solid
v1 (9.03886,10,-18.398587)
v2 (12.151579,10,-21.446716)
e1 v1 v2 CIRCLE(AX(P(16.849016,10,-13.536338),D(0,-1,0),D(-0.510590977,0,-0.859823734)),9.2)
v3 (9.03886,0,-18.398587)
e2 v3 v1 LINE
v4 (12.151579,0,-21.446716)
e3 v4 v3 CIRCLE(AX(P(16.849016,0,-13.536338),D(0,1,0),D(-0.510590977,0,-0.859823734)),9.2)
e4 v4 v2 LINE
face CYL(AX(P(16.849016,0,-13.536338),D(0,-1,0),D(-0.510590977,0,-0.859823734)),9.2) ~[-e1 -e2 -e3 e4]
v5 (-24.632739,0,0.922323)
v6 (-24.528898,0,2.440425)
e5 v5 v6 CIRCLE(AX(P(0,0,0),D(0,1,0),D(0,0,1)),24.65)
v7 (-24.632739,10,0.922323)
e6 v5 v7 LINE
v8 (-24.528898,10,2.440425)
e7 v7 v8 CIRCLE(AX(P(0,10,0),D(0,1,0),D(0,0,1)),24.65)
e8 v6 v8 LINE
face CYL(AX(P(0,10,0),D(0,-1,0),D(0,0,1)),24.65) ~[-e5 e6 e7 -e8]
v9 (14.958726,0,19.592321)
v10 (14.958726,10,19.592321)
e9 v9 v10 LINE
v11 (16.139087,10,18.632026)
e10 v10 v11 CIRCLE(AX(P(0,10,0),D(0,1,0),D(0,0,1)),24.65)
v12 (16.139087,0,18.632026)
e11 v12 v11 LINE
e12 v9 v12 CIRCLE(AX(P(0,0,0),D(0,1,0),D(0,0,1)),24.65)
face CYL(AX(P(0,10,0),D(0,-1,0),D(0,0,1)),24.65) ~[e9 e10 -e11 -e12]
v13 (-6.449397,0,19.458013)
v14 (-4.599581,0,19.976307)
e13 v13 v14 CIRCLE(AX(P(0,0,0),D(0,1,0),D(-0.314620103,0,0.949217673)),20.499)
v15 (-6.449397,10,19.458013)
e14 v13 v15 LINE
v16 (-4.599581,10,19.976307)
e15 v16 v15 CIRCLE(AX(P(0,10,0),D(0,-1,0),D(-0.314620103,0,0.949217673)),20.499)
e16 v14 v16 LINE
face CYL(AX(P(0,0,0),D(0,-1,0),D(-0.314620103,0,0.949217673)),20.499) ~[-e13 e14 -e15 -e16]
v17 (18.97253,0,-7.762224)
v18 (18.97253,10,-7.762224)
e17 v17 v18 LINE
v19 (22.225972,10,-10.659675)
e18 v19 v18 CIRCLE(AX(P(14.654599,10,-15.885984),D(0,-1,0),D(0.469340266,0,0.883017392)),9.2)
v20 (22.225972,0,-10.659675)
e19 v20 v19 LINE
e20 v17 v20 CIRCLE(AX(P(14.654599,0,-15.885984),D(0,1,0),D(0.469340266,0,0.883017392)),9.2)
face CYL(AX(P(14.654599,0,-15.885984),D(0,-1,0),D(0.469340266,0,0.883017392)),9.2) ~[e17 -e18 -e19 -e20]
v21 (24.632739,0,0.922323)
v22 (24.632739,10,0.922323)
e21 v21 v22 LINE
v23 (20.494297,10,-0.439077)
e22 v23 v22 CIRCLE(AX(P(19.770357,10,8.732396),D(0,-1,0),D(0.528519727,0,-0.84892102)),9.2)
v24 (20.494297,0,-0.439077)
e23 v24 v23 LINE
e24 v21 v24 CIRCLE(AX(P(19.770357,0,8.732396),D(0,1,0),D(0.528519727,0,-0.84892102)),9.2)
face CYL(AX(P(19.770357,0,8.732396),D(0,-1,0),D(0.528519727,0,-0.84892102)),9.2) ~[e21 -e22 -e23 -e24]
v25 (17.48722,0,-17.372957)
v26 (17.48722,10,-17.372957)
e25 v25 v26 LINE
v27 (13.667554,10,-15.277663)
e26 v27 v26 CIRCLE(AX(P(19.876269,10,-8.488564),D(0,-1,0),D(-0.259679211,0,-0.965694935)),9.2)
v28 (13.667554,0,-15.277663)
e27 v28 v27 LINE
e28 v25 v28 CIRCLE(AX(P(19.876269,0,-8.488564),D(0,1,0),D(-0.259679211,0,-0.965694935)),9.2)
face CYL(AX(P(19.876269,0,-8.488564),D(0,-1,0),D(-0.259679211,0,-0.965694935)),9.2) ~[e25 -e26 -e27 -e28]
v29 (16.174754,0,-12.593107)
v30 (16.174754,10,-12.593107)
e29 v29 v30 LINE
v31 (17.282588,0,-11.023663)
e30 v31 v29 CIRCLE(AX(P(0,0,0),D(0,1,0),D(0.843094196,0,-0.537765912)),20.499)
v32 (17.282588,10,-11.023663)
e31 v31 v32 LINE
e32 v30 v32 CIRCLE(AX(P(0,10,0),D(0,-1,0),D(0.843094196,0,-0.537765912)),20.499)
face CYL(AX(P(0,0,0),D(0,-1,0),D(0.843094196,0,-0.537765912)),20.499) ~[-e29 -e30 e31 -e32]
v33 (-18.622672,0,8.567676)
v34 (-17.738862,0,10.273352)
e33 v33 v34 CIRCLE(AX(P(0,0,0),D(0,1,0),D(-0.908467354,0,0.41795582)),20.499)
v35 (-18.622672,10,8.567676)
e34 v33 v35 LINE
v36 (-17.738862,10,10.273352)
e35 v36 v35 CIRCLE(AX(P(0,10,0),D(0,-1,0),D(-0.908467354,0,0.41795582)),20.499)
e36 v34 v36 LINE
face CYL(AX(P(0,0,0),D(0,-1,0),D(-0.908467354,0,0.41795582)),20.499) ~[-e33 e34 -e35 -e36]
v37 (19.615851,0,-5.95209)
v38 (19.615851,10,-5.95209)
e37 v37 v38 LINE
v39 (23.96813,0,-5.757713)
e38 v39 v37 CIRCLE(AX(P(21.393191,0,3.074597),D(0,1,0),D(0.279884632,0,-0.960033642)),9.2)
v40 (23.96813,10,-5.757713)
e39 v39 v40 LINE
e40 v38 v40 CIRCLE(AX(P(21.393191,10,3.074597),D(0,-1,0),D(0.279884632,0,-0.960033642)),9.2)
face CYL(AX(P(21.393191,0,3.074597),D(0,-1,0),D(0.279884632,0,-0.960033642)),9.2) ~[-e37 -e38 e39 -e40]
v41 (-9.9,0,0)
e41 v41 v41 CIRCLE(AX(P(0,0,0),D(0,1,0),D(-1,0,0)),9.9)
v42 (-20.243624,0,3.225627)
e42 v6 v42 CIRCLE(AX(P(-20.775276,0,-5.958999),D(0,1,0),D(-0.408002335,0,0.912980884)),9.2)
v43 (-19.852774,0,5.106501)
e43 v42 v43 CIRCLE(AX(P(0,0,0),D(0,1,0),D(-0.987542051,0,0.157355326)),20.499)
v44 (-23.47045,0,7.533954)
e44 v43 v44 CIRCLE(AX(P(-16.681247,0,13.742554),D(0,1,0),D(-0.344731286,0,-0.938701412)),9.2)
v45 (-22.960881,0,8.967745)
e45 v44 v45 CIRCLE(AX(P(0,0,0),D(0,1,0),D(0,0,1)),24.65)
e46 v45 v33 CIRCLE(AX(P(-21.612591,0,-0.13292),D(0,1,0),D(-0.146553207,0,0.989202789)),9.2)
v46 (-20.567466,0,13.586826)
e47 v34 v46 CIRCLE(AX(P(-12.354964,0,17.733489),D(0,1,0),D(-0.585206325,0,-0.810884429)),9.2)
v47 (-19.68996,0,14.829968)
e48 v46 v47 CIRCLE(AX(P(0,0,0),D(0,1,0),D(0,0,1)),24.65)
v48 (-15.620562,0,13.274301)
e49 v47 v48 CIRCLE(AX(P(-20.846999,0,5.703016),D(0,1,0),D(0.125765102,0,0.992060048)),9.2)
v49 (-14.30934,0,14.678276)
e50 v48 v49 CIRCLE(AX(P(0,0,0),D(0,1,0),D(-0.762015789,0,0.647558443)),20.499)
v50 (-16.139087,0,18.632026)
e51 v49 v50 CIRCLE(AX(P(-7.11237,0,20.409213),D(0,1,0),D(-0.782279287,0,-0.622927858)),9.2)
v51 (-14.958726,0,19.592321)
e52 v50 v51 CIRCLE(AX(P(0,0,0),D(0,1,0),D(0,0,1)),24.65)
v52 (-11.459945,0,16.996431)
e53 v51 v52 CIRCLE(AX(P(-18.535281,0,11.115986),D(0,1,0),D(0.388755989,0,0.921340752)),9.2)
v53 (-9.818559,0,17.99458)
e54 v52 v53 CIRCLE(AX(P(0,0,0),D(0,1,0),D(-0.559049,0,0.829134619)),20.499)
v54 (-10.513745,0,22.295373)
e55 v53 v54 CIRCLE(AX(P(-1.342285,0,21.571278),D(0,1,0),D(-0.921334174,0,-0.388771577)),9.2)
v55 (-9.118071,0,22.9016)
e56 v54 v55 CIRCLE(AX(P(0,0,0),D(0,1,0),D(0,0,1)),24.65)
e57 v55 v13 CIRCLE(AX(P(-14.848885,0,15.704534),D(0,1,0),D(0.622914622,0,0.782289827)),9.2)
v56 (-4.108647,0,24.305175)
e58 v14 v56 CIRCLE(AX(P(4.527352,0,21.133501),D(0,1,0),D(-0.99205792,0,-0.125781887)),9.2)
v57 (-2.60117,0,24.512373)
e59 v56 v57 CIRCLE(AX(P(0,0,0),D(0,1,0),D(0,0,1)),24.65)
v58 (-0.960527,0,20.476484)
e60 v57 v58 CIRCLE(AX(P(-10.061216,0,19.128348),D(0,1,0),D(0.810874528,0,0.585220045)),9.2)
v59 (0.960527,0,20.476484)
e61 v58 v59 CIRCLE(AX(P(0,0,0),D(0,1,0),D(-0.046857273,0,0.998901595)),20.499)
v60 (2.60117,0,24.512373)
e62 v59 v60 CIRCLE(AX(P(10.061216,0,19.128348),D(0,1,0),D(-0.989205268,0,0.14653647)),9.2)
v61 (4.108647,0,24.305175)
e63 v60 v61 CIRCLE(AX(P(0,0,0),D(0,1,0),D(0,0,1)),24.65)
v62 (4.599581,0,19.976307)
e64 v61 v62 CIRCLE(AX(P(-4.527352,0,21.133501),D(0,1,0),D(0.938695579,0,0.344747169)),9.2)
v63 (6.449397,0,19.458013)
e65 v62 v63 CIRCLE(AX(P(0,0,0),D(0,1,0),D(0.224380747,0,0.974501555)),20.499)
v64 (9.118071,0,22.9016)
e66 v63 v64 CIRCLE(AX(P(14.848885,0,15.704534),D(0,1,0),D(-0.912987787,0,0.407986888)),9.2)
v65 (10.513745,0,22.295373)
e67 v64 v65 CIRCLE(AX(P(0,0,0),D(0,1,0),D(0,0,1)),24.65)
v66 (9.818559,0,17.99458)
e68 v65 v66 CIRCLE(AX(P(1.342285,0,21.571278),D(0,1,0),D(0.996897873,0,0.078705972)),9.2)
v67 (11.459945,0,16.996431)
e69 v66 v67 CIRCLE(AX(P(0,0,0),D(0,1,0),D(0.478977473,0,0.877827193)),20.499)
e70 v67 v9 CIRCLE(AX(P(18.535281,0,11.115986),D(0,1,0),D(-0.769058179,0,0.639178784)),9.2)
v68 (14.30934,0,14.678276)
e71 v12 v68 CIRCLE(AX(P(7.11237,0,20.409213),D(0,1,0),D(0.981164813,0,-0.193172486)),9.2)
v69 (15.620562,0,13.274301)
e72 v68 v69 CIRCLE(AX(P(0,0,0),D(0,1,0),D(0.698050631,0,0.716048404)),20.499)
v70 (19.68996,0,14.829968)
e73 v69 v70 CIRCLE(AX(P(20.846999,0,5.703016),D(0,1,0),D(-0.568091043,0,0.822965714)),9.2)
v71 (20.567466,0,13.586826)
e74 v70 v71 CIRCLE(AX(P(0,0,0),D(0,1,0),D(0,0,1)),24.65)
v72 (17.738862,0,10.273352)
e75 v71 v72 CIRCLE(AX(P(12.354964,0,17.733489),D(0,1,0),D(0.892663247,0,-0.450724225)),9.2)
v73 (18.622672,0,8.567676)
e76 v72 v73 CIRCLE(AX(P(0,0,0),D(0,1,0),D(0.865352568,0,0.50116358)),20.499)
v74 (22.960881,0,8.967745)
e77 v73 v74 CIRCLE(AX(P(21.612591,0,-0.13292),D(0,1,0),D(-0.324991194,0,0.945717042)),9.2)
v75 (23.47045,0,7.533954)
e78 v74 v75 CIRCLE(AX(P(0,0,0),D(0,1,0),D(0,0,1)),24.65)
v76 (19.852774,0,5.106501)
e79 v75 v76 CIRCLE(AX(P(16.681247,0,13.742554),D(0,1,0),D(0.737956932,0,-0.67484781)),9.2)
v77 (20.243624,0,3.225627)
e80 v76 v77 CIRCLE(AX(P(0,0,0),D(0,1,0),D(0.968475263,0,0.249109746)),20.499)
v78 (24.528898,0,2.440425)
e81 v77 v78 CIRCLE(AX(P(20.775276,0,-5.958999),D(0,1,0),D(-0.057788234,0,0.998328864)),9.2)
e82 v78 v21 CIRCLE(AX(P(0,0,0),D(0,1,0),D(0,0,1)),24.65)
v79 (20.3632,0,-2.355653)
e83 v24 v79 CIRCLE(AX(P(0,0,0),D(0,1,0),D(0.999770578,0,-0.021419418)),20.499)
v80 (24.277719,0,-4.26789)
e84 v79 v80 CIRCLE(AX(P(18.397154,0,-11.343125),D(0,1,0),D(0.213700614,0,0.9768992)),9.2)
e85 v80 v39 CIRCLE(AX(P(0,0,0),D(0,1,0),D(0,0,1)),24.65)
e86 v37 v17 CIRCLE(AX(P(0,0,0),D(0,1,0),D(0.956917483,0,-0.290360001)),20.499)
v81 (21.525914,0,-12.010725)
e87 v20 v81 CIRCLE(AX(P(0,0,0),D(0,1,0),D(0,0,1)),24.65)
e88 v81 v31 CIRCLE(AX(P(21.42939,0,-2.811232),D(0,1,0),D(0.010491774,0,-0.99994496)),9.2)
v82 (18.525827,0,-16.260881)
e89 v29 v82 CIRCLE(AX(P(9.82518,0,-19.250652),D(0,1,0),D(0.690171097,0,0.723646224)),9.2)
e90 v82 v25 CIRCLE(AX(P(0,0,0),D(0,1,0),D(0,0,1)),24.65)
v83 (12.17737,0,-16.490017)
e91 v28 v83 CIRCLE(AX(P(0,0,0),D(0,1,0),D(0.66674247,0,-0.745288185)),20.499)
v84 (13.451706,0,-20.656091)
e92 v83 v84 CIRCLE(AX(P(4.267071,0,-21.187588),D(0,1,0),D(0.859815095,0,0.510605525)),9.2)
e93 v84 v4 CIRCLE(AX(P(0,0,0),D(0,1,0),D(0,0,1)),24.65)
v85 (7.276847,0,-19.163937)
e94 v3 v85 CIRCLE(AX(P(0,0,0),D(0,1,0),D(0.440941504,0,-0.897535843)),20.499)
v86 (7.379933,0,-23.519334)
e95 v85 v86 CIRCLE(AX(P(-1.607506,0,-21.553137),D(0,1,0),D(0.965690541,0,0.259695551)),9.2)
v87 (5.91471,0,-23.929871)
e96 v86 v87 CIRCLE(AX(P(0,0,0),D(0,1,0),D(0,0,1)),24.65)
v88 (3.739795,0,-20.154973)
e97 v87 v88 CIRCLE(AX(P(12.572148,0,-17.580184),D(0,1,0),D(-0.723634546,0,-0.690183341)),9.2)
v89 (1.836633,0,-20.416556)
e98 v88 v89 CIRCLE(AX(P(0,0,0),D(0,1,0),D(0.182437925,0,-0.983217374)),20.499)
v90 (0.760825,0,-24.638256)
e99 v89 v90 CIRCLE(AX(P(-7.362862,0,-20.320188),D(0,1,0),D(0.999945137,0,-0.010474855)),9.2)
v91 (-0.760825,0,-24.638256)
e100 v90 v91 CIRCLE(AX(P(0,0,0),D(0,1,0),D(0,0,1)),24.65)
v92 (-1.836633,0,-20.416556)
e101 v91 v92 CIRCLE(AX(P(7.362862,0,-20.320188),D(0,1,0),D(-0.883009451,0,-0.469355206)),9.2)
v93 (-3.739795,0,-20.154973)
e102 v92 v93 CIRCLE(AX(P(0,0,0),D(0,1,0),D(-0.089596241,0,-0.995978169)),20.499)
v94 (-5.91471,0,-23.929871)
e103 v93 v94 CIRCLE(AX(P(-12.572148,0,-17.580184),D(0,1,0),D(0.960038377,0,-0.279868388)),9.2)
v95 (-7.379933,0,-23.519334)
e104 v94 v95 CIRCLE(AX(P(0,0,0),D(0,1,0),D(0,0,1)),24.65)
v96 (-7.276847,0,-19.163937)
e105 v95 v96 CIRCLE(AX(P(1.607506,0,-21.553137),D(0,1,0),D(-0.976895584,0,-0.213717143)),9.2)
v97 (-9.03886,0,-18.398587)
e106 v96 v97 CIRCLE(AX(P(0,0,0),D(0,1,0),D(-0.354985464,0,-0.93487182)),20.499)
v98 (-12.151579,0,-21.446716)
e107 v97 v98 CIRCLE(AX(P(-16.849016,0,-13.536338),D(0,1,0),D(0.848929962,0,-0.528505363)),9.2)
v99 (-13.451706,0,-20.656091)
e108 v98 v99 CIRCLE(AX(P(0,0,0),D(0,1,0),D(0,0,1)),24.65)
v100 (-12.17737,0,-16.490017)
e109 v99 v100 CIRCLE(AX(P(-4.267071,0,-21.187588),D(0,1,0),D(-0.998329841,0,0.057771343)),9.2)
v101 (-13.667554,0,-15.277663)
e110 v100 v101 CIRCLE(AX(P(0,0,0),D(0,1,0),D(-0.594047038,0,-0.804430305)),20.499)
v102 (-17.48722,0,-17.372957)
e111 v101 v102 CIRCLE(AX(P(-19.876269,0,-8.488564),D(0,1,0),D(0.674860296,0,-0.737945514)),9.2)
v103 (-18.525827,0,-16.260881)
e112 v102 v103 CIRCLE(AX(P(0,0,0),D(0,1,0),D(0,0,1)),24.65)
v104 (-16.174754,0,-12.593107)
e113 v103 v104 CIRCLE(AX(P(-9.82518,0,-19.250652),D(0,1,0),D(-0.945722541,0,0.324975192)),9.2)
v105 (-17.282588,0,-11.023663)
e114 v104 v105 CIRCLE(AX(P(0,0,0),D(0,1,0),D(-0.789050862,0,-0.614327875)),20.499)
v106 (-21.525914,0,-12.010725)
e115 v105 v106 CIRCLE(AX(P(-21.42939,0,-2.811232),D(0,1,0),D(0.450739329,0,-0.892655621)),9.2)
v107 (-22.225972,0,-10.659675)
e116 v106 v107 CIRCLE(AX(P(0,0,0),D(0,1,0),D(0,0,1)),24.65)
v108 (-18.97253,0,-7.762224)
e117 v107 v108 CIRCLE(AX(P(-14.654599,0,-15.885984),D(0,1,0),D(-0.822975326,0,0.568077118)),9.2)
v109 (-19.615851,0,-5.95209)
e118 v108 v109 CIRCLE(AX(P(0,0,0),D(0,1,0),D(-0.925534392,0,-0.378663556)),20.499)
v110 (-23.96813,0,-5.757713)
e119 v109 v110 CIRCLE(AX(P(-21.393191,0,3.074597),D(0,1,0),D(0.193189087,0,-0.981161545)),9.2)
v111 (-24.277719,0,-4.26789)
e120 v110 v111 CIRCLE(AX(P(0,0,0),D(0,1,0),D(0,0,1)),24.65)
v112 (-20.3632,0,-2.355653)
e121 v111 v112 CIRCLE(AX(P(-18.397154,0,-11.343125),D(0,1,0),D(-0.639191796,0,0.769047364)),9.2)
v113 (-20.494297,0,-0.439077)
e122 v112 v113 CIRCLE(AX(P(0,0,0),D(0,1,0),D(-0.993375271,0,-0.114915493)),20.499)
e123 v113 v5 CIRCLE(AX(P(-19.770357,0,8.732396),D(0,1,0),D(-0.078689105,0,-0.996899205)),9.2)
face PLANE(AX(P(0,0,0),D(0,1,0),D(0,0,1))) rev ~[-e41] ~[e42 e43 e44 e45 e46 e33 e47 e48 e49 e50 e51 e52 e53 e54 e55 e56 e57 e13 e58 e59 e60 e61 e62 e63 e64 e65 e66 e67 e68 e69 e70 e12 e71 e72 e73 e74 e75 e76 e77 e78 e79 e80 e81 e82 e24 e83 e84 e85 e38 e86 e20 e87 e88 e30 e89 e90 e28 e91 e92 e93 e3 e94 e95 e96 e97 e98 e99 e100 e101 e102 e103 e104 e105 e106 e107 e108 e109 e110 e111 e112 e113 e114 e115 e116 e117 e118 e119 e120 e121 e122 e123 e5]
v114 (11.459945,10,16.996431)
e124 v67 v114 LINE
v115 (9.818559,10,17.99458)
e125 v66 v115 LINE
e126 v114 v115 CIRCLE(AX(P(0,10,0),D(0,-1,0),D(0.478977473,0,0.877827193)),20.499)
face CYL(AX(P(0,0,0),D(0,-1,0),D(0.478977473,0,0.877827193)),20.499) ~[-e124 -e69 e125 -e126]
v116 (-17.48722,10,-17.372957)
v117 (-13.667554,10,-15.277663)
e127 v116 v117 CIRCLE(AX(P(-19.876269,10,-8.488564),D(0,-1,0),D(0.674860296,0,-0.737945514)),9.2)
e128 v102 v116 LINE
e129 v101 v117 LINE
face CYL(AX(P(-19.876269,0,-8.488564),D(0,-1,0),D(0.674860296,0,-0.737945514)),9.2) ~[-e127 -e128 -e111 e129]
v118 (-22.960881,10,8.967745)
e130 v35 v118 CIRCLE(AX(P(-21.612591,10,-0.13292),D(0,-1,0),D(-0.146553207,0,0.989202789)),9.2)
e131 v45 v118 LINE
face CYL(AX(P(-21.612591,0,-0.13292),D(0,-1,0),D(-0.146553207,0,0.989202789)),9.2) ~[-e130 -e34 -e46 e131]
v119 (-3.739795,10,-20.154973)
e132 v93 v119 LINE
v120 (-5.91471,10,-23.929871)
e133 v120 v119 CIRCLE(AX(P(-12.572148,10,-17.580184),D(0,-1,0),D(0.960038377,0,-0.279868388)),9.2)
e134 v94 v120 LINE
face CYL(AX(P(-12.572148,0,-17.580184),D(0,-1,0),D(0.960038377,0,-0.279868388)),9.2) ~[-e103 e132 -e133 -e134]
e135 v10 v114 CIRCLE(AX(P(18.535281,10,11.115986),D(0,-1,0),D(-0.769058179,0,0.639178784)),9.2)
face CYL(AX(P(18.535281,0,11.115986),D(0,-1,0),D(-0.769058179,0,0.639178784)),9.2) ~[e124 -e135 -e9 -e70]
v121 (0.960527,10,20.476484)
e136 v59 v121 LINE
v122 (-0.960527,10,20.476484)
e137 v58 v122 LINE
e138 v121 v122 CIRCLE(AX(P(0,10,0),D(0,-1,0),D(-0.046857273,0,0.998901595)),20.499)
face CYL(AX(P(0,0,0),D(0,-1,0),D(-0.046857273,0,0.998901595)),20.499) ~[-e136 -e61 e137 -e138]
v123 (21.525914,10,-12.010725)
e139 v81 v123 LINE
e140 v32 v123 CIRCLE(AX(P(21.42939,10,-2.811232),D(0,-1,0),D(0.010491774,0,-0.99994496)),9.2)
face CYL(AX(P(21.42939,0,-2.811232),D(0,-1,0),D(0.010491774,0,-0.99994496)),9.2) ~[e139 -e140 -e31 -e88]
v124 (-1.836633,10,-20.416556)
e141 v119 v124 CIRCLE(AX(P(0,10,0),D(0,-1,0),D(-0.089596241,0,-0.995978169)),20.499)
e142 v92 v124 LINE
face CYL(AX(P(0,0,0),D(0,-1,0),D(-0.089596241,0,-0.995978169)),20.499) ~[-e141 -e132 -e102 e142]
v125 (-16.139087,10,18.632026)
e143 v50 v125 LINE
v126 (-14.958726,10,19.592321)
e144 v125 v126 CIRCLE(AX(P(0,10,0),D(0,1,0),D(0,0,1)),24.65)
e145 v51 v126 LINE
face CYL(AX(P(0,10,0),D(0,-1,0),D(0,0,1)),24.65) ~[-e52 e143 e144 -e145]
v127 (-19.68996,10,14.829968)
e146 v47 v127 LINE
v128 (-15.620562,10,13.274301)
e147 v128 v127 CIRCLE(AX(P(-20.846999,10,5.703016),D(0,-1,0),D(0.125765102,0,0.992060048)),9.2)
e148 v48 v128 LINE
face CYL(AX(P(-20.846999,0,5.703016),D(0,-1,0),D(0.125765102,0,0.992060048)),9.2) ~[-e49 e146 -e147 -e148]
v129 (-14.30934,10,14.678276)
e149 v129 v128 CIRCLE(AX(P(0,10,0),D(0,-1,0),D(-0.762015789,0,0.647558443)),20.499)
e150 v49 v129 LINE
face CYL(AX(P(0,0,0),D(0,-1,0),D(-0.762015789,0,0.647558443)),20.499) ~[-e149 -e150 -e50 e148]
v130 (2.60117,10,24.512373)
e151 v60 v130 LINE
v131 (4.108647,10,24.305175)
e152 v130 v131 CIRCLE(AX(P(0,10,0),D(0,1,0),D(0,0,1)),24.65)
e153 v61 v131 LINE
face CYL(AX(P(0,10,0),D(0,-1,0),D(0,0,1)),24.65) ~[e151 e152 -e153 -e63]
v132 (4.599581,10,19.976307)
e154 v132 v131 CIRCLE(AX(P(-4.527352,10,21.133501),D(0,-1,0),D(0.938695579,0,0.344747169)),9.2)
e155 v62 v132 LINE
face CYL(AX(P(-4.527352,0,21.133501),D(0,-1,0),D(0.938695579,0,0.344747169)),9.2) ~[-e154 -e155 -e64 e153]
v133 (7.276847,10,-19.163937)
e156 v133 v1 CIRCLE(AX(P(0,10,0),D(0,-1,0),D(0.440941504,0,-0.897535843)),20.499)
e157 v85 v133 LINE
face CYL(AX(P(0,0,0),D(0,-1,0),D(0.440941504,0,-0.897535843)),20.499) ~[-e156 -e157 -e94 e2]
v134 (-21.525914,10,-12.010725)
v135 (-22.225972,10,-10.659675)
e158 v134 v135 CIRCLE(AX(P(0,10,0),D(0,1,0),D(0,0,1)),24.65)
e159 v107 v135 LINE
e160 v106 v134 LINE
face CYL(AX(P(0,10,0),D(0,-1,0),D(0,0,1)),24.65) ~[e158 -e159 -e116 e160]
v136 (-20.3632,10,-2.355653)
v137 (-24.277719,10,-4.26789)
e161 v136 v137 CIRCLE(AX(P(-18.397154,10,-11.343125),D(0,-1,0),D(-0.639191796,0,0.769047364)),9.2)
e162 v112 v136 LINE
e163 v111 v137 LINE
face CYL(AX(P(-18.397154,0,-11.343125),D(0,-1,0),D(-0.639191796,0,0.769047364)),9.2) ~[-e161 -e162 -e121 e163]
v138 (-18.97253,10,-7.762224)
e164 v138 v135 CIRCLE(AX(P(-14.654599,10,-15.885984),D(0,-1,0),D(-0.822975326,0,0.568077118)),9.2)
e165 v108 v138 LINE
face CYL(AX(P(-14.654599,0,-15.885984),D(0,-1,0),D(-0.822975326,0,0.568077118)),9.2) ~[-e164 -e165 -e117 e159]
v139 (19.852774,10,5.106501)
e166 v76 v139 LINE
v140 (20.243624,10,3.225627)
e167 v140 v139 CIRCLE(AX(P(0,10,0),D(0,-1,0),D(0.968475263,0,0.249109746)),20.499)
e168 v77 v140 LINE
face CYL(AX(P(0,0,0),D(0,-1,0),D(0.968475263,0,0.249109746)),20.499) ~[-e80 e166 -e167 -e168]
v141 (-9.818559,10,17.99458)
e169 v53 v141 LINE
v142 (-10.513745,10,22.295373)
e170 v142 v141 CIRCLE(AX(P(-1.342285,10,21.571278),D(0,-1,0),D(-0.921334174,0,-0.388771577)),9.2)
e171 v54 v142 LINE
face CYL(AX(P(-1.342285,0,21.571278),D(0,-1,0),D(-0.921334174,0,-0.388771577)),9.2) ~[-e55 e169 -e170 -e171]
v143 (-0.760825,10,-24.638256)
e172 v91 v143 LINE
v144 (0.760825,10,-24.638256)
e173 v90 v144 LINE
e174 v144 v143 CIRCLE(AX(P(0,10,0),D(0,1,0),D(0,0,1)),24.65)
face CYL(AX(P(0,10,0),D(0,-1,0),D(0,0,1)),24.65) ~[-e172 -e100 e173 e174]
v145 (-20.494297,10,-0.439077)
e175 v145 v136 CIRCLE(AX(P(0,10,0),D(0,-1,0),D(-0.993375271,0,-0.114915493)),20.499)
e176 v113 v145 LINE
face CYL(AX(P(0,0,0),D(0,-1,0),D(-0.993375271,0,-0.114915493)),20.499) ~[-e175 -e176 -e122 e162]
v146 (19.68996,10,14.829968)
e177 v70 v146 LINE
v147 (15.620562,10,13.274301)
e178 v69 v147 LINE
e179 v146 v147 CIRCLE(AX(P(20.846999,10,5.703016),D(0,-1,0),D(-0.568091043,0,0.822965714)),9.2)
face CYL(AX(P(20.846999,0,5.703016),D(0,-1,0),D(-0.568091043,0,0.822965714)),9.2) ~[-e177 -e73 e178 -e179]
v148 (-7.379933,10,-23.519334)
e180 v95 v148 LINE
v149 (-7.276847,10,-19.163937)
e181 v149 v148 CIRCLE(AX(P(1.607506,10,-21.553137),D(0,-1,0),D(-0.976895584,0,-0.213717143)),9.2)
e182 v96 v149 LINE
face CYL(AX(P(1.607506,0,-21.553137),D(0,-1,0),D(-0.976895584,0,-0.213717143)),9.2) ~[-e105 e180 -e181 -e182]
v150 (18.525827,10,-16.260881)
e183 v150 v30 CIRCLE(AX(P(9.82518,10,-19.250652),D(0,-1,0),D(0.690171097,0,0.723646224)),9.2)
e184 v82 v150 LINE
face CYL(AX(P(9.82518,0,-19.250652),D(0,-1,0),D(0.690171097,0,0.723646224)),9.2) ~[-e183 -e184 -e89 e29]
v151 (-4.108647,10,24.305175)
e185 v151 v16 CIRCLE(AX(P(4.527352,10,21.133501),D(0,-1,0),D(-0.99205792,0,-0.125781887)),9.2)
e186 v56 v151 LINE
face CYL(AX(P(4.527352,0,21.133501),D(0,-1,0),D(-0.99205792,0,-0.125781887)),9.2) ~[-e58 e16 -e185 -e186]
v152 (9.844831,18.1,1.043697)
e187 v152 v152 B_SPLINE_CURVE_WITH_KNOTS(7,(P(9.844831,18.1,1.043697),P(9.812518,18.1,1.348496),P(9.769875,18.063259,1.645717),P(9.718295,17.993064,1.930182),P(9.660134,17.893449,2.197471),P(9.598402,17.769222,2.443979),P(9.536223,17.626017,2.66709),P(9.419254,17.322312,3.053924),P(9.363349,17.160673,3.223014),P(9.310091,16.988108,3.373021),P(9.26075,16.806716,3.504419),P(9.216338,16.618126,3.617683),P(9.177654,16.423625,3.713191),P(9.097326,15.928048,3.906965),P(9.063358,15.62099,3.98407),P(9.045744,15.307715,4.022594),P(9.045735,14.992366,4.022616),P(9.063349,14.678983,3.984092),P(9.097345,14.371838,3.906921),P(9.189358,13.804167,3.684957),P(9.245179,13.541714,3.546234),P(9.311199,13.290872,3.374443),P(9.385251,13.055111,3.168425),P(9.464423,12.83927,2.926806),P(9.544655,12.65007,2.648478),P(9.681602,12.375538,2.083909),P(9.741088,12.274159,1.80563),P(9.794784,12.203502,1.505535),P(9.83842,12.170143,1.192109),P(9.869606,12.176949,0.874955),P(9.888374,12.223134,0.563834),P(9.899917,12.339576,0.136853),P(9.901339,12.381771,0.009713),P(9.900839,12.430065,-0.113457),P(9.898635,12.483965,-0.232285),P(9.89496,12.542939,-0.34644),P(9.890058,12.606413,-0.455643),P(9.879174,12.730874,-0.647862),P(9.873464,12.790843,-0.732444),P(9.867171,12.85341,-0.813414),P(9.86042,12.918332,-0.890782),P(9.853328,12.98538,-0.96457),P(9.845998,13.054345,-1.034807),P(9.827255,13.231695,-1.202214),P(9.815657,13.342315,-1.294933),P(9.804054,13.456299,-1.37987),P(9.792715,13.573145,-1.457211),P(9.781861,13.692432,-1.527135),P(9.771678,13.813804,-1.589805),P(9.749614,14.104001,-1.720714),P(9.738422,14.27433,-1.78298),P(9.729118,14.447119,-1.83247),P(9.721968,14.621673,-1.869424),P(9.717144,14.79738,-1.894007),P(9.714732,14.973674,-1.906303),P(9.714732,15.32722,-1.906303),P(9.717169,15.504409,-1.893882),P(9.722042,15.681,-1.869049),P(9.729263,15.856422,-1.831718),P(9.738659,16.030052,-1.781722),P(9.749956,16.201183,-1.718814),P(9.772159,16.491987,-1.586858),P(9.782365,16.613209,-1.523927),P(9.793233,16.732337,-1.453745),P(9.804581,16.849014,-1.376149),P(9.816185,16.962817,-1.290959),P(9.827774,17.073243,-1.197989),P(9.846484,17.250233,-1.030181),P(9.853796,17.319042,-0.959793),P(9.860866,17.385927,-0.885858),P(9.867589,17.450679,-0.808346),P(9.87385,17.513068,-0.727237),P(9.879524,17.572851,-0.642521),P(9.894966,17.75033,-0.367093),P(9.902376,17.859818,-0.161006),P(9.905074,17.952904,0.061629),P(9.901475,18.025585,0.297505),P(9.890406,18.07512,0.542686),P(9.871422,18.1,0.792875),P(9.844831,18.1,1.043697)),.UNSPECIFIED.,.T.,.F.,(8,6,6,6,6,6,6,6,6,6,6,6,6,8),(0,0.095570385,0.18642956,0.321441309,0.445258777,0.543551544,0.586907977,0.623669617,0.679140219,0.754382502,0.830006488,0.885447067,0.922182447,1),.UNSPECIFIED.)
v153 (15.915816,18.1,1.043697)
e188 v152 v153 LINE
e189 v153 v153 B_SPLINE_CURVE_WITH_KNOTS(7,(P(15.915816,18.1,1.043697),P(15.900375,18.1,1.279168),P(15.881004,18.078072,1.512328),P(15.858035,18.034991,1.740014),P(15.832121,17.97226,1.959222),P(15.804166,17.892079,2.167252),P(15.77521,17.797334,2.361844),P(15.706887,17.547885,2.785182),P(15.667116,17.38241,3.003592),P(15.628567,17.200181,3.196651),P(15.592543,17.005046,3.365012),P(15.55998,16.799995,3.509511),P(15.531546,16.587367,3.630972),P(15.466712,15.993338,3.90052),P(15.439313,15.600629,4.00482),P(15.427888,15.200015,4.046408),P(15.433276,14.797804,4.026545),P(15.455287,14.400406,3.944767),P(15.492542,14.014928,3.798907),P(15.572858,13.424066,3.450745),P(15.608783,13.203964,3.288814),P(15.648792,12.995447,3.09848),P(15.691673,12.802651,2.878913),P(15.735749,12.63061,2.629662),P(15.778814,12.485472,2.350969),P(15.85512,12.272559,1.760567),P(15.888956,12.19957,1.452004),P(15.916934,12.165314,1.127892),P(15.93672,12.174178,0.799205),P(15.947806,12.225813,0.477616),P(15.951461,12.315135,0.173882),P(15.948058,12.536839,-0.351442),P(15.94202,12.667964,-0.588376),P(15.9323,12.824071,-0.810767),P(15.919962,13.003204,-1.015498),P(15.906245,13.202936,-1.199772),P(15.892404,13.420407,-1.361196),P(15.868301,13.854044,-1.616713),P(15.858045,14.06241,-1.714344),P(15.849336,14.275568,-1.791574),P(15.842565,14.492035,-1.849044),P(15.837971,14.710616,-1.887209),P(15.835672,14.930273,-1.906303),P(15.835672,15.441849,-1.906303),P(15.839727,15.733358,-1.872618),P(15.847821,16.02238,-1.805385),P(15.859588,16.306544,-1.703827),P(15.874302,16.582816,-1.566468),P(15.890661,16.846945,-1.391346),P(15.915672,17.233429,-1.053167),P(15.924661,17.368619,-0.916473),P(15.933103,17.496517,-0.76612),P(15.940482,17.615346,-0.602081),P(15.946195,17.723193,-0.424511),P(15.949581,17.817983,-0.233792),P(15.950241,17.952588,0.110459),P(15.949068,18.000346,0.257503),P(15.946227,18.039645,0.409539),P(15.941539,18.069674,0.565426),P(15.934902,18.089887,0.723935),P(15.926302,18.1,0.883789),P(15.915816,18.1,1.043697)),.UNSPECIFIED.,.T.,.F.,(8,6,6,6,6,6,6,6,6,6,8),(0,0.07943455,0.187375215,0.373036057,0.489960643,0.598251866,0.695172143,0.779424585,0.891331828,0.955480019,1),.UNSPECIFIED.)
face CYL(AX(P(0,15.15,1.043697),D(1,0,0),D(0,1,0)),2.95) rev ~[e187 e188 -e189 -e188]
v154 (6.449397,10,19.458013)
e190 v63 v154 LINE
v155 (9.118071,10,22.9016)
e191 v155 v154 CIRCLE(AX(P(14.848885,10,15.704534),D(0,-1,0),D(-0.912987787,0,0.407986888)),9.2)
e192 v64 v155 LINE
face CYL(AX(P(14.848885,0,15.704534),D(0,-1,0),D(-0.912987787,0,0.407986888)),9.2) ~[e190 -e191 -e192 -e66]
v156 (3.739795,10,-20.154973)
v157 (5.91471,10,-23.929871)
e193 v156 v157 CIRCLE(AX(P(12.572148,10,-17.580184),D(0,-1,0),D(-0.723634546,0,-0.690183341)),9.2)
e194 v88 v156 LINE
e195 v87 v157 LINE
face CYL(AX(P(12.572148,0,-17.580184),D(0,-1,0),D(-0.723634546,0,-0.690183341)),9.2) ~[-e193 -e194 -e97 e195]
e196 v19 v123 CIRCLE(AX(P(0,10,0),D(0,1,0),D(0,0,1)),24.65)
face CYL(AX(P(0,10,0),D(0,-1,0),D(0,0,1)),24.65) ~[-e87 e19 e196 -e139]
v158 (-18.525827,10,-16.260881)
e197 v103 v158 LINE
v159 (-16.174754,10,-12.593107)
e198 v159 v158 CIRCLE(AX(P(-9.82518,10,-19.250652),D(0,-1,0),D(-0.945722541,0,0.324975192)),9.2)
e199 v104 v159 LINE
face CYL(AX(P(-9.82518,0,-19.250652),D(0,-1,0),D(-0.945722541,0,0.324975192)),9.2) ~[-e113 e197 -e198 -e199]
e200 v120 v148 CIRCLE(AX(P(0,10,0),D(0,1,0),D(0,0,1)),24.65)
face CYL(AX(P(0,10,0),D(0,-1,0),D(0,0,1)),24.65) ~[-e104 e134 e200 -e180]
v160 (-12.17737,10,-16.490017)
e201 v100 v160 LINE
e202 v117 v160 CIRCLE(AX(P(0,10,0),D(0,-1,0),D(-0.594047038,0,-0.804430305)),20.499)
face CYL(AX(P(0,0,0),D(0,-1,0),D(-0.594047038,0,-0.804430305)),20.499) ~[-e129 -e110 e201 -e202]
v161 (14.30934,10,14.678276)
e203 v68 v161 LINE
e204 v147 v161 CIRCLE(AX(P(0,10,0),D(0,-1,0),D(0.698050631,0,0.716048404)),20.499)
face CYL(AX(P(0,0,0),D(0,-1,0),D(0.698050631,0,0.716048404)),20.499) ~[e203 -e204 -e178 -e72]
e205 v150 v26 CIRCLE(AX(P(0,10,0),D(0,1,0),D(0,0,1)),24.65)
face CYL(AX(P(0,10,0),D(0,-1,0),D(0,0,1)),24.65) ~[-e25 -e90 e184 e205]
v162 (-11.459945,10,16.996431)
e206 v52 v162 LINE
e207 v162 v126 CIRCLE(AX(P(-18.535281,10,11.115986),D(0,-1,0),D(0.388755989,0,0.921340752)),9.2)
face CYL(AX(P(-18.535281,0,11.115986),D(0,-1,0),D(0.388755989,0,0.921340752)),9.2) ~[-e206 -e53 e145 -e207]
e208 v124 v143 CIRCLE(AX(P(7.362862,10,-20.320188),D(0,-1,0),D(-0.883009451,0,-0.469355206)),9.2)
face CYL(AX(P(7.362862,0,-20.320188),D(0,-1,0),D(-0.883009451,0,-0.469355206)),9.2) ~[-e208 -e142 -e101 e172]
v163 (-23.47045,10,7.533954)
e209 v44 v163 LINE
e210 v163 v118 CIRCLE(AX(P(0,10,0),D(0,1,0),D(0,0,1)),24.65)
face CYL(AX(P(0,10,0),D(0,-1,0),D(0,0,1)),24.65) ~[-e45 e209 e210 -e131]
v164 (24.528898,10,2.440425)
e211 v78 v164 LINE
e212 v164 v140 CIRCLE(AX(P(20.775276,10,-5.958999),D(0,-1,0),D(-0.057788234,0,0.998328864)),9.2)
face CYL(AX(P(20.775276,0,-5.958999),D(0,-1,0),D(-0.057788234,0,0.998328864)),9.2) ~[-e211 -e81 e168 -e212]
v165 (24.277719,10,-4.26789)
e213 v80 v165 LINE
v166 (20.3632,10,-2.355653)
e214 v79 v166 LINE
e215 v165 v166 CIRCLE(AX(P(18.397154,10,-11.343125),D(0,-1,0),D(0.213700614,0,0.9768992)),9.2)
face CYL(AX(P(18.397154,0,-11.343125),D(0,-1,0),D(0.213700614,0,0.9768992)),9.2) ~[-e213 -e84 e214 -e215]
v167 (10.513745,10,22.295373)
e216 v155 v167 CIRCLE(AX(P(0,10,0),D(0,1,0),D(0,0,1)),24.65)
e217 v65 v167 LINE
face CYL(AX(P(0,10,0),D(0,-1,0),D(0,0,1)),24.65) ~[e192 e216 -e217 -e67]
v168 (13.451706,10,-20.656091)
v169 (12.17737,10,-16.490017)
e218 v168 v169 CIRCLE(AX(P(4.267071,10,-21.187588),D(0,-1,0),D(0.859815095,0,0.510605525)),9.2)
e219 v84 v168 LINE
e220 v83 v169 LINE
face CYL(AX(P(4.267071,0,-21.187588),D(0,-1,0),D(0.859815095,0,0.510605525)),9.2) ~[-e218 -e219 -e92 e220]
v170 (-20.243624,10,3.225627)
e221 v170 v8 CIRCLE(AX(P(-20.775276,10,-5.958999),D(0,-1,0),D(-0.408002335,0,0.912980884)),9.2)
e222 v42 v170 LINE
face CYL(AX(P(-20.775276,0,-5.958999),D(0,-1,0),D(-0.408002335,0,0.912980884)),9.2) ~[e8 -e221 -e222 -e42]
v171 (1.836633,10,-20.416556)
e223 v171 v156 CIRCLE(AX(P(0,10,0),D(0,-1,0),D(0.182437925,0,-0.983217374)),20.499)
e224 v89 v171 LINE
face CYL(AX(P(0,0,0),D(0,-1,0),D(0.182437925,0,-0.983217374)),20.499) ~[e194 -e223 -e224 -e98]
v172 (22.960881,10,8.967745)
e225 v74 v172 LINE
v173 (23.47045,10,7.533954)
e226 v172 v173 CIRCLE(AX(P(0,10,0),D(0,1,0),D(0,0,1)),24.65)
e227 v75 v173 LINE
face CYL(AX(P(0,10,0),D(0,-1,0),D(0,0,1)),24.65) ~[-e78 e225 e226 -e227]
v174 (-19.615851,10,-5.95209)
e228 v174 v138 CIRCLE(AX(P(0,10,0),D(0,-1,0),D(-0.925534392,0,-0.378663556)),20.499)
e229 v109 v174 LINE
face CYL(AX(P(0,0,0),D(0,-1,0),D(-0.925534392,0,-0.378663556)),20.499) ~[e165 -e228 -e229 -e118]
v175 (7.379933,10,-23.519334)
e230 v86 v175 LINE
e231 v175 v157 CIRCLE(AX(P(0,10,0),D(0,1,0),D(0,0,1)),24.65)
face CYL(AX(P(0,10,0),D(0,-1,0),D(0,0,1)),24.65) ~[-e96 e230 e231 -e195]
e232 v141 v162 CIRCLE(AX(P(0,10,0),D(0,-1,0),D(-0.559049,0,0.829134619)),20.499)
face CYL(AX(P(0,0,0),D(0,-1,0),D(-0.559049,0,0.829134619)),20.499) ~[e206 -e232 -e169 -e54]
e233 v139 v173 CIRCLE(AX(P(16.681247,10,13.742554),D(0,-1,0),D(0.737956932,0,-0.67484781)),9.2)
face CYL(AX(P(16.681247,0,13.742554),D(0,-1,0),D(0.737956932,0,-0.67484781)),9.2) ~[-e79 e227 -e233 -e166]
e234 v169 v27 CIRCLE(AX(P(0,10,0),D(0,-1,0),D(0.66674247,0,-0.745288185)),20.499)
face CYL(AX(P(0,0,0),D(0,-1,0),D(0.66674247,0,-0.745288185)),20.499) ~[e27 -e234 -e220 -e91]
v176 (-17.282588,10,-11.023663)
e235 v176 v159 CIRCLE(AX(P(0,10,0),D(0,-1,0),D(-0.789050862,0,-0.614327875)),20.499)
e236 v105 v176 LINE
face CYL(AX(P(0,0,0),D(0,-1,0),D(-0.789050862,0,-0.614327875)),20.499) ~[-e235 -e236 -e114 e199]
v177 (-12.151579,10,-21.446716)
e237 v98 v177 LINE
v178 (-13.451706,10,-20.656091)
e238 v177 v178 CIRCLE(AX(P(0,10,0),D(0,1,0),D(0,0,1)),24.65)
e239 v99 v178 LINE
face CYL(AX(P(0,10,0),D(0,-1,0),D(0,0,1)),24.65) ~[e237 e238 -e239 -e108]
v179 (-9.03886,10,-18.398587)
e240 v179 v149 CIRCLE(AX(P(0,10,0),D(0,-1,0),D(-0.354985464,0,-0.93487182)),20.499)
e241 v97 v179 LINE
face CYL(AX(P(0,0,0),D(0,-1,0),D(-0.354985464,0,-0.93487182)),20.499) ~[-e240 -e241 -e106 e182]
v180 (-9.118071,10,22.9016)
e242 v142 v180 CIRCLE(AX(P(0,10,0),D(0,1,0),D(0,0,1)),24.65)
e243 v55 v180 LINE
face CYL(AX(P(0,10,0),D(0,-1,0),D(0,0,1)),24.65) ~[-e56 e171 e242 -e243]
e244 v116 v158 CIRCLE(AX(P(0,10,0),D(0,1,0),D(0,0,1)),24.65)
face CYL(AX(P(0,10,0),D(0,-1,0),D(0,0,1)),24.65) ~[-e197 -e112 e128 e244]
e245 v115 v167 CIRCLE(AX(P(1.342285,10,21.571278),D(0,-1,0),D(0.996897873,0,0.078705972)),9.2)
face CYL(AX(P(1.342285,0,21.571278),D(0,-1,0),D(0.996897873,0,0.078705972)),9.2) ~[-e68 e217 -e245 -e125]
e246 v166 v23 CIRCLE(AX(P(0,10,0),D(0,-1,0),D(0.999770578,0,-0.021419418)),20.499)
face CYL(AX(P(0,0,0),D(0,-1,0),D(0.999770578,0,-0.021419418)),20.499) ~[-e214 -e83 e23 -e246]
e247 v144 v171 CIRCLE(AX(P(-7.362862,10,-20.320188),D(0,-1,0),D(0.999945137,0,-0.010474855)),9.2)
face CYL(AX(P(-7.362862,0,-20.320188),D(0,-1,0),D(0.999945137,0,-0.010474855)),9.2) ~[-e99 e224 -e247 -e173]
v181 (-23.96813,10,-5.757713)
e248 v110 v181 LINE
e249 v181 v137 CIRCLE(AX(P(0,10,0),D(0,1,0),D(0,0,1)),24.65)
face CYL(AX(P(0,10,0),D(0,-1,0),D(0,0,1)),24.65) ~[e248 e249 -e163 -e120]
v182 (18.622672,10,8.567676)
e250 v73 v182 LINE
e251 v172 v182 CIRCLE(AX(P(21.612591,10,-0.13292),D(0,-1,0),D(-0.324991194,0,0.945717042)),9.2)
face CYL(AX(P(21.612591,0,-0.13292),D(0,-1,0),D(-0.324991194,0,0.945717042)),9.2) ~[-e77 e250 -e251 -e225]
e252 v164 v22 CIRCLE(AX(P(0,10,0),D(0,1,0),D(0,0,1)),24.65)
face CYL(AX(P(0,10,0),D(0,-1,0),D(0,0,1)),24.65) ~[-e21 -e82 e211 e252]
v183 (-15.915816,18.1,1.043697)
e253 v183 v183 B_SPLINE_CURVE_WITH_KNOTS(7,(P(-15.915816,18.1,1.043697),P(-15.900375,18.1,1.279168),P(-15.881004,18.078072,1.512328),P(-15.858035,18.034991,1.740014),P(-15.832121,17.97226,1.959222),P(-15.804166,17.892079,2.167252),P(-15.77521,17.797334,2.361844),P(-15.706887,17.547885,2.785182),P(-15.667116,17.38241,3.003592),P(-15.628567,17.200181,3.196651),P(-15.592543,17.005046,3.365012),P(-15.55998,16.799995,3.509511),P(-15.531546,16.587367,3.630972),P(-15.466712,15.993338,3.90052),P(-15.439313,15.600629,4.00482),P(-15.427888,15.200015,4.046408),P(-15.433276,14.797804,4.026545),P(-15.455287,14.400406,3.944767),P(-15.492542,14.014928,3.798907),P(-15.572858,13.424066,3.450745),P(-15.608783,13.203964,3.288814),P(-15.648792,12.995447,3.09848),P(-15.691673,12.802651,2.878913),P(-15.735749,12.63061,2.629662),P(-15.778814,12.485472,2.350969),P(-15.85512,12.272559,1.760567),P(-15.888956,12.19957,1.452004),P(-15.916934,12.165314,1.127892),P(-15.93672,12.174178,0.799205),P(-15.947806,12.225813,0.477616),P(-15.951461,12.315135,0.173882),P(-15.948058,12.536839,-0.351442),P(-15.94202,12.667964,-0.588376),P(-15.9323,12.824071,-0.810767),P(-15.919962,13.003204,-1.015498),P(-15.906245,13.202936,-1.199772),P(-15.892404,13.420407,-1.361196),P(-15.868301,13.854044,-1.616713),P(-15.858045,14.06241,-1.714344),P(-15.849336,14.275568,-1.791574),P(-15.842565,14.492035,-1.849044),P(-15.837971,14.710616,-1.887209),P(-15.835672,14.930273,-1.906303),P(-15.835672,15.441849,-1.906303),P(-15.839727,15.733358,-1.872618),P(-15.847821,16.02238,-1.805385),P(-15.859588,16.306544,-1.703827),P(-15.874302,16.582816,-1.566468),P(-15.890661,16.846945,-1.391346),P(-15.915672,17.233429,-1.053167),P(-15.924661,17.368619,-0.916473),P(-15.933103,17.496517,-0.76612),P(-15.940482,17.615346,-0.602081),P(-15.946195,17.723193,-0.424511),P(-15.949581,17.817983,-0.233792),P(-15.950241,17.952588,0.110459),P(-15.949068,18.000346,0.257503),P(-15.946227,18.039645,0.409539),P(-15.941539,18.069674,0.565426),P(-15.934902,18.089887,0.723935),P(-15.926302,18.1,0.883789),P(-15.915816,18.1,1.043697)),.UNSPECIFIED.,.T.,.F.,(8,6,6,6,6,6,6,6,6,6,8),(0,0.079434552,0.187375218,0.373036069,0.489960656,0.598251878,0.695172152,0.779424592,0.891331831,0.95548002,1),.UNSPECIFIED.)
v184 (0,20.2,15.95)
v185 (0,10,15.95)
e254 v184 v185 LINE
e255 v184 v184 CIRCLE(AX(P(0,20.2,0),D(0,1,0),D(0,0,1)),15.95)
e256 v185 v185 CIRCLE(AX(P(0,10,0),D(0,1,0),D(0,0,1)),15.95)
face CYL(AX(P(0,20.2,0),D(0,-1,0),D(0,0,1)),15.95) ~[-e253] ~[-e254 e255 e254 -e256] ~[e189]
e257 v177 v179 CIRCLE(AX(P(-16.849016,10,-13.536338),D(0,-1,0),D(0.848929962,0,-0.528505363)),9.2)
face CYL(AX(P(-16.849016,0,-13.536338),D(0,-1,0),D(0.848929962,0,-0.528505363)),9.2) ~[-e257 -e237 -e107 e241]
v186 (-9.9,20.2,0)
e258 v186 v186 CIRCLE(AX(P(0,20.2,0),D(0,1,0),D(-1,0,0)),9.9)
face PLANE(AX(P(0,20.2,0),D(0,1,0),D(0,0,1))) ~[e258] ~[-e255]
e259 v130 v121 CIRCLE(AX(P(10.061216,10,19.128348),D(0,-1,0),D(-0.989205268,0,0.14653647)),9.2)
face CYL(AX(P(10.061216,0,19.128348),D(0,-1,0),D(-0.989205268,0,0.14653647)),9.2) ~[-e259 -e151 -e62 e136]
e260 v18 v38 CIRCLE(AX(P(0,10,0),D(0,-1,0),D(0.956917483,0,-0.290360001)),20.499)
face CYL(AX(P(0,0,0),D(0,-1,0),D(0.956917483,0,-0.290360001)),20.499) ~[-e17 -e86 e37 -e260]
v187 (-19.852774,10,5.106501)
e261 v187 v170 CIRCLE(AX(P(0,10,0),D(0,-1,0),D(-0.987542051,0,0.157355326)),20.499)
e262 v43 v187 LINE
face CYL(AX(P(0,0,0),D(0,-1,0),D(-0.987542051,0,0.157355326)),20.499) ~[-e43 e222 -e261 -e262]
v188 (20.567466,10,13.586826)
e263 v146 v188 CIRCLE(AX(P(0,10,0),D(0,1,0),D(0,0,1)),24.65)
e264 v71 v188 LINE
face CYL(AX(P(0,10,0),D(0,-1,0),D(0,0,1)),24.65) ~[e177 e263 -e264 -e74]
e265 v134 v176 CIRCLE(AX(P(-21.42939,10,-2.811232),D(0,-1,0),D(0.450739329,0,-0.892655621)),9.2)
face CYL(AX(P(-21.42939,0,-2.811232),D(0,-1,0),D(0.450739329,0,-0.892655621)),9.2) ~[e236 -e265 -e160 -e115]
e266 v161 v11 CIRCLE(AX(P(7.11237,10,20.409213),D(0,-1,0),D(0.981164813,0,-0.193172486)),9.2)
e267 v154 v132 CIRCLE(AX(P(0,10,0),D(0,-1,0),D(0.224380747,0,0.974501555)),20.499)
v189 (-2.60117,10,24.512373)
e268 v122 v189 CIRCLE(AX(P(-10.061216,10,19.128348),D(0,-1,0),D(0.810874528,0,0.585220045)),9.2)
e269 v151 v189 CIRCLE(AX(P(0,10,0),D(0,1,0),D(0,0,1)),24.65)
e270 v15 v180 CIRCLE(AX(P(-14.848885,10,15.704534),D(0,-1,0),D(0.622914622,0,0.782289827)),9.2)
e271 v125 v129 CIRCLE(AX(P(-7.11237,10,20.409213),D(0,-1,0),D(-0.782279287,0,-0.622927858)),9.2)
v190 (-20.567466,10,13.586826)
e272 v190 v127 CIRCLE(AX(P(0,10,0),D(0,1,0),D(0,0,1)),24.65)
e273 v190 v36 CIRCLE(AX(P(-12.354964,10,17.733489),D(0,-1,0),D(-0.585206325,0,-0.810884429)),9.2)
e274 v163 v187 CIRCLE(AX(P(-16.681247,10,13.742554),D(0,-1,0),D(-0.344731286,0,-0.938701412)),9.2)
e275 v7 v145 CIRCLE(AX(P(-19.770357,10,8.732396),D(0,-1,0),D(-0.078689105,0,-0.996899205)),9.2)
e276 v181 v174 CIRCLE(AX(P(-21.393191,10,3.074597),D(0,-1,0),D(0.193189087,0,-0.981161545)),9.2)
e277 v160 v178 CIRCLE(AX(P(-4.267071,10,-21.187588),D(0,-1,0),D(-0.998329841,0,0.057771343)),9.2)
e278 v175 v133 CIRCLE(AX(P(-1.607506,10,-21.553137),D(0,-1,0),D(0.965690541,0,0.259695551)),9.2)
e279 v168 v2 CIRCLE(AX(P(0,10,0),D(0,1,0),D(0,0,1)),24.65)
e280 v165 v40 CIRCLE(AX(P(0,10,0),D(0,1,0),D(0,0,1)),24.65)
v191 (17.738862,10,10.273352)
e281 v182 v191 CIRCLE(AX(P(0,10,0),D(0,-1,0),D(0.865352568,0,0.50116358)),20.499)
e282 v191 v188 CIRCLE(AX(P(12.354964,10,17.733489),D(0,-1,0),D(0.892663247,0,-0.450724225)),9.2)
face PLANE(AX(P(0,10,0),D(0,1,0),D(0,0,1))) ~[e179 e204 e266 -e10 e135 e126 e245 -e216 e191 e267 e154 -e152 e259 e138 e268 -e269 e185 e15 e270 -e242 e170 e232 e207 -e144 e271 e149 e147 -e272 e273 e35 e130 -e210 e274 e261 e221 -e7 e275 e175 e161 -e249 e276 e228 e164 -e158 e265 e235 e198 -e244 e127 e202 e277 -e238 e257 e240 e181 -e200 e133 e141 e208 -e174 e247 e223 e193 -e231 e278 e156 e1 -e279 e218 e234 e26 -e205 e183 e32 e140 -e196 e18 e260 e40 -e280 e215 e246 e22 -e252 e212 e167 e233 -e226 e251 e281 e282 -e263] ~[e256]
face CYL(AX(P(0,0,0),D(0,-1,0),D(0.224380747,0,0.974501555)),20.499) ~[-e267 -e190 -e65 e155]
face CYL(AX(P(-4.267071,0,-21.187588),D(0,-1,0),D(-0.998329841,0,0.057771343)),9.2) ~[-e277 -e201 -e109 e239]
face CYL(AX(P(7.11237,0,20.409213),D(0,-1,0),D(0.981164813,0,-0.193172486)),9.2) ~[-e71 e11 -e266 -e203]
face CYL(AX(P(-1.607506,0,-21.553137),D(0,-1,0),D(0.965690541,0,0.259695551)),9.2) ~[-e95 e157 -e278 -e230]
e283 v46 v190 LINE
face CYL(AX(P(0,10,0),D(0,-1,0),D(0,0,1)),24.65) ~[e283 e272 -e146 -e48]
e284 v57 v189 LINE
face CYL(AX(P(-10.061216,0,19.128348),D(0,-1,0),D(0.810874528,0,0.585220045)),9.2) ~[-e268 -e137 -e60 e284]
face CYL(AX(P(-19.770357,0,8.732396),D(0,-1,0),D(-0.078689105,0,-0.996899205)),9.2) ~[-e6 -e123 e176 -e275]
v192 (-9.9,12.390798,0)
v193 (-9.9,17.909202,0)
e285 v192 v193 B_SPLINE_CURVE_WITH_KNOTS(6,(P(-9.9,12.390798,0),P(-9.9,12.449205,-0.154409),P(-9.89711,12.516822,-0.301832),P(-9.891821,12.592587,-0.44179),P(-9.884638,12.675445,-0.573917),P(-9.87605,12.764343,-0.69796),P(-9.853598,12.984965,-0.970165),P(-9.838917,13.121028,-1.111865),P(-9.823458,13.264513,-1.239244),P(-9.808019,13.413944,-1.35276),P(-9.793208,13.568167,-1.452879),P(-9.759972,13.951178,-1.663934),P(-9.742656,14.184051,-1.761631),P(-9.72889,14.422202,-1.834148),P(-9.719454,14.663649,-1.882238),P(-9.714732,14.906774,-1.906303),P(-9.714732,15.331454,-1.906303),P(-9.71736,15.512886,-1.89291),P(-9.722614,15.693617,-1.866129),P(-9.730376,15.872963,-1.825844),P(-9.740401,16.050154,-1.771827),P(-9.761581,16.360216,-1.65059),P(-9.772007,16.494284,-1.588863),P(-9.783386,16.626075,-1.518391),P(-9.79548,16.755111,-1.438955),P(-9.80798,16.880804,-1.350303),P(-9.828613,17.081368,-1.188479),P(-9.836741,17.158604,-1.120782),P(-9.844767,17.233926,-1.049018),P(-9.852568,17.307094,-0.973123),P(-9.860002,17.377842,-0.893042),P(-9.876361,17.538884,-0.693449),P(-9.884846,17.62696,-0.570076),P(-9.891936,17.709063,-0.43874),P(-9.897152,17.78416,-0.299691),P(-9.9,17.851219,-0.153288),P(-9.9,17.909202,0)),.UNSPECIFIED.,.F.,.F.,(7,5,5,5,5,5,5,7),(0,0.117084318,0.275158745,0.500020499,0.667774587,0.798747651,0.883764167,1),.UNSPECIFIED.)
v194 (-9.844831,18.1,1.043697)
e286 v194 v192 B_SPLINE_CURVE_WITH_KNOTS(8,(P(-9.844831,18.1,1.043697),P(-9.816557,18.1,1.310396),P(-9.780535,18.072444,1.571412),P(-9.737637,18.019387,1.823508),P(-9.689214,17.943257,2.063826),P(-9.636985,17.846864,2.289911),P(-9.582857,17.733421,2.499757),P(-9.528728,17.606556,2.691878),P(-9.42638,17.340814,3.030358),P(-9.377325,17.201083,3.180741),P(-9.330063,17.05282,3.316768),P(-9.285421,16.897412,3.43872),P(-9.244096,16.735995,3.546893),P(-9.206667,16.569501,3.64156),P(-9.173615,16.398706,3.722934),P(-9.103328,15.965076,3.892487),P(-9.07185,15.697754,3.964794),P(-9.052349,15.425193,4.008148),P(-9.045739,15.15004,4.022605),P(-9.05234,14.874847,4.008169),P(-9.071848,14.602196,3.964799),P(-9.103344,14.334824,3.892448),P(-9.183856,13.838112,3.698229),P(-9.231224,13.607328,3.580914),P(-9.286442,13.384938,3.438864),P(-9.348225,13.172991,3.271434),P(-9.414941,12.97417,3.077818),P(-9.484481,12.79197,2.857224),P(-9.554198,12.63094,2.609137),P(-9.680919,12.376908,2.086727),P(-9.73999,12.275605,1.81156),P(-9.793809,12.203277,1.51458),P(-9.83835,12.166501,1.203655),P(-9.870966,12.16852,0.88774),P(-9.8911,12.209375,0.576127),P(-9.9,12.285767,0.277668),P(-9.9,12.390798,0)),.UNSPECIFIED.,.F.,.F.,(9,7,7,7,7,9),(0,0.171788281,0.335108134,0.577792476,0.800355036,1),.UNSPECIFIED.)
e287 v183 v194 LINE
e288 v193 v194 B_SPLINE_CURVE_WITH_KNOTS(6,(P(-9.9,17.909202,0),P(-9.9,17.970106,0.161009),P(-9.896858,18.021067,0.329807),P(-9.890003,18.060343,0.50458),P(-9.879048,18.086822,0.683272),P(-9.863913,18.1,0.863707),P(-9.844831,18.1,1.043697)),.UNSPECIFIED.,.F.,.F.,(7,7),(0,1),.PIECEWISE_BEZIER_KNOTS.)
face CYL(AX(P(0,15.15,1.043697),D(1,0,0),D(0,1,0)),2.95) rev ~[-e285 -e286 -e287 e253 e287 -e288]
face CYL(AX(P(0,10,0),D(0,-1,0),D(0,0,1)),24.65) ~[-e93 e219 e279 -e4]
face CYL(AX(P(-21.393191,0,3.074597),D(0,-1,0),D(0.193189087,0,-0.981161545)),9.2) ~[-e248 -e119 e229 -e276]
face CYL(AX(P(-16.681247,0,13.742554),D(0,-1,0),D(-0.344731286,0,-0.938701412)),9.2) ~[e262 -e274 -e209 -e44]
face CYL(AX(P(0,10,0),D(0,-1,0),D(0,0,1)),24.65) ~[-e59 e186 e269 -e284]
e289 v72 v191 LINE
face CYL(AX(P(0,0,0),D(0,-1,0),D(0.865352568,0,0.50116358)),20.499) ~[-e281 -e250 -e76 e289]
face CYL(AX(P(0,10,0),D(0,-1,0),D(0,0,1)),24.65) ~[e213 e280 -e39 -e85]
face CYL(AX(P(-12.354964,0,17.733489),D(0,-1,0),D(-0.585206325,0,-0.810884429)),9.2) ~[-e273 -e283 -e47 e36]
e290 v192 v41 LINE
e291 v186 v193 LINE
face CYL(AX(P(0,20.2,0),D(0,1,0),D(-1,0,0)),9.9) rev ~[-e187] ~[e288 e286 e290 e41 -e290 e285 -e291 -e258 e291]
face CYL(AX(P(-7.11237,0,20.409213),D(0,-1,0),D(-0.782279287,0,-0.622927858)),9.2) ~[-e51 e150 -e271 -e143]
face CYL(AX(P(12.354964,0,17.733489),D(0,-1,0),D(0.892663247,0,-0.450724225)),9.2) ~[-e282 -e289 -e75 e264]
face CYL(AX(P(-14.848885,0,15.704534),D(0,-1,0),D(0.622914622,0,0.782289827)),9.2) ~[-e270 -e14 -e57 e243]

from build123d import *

# Parameters (mm, degrees)
F2_R            = 9.9
F3_DEPTH        = 25
F5_DEPTH        = 25
F5_COPIES_COUNT = 23
F7_R            = 2.95
F8_DEPTH        = 37.3


# Not quite as in the source:
# - a feature of the source that left no trace in its solid (it failed there, or was rolled back) is left out
# - a pattern or mirror of a feature is missing from the dataset's text; its kind, count and spacing are read off the source's solid


with BuildPart() as f1:
    # F0 (on Right) → F1 (revolve)
    with BuildSketch(Plane.YZ):
        Polygon((0, 24.65), (0, 0), (20.2, 0), (20.2, 15.95), (10, 15.95), (10, 24.65), align=None)
    revolve(axis=Axis((0, 10.1, 0), (0, 1, 0)))

    # F2 (on face) → F3 (cut)
    with BuildSketch(Plane(origin=(0, 20.2, 0), x_dir=(-1, 0, 0), z_dir=(0, 1, 0))):
        Circle(F2_R)
    extrude(amount=-F3_DEPTH, mode=Mode.SUBTRACT)

    # F4 (on face) → F5 (cut)
    with BuildSketch(Plane.XZ):
        with BuildLine():
            ThreePointArc((0.9605272399, 20.4764837905), (1.5385061373, 22.5929437067), (2.6011700561, 24.5123726787))
            ThreePointArc((2.6011700561, 24.5123726787), (0, 24.65), (-2.6011700561, 24.5123726787))
            ThreePointArc((-2.6011700561, 24.5123726787), (-1.5385061373, 22.5929437067), (-0.9605272399, 20.4764837905))
            ThreePointArc((-0.9605272399, 20.4764837905), (0, 20.499), (0.9605272399, 20.4764837905))
        make_face()
        with BuildLine():
            ThreePointArc((2.6011700561, 24.5123726787), (2.8144449637, 24.7961797548), (3.0385106282, 25.0715471833))
            ThreePointArc((3.0385106282, 25.0715471833), (0, 25.255), (-3.0385106282, 25.0715471833))
            ThreePointArc((-3.0385106282, 25.0715471833), (-2.8144449637, 24.7961797548), (-2.6011700561, 24.5123726787))
            ThreePointArc((-2.6011700561, 24.5123726787), (0, 24.65), (2.6011700561, 24.5123726787))
        make_face()
    f5 = extrude(amount=-F5_DEPTH, mode=Mode.SUBTRACT)

    # F5_copies: F5 ×23 about axis
    f5_copies_axis = Axis((0, 0, 0), (0, 1, 0))
    for i in range(1, F5_COPIES_COUNT):
        add(f5.rotate(f5_copies_axis, i * 360 / F5_COPIES_COUNT), mode=Mode.SUBTRACT)

    # F7 (on Right) → F8 (cut, symmetric)
    with BuildSketch(Plane.YZ):
        with Locations((15.15, 1.0436970042)):
            Circle(F7_R)
    extrude(amount=F8_DEPTH, both=True, mode=Mode.SUBTRACT)


solid = f1.part
